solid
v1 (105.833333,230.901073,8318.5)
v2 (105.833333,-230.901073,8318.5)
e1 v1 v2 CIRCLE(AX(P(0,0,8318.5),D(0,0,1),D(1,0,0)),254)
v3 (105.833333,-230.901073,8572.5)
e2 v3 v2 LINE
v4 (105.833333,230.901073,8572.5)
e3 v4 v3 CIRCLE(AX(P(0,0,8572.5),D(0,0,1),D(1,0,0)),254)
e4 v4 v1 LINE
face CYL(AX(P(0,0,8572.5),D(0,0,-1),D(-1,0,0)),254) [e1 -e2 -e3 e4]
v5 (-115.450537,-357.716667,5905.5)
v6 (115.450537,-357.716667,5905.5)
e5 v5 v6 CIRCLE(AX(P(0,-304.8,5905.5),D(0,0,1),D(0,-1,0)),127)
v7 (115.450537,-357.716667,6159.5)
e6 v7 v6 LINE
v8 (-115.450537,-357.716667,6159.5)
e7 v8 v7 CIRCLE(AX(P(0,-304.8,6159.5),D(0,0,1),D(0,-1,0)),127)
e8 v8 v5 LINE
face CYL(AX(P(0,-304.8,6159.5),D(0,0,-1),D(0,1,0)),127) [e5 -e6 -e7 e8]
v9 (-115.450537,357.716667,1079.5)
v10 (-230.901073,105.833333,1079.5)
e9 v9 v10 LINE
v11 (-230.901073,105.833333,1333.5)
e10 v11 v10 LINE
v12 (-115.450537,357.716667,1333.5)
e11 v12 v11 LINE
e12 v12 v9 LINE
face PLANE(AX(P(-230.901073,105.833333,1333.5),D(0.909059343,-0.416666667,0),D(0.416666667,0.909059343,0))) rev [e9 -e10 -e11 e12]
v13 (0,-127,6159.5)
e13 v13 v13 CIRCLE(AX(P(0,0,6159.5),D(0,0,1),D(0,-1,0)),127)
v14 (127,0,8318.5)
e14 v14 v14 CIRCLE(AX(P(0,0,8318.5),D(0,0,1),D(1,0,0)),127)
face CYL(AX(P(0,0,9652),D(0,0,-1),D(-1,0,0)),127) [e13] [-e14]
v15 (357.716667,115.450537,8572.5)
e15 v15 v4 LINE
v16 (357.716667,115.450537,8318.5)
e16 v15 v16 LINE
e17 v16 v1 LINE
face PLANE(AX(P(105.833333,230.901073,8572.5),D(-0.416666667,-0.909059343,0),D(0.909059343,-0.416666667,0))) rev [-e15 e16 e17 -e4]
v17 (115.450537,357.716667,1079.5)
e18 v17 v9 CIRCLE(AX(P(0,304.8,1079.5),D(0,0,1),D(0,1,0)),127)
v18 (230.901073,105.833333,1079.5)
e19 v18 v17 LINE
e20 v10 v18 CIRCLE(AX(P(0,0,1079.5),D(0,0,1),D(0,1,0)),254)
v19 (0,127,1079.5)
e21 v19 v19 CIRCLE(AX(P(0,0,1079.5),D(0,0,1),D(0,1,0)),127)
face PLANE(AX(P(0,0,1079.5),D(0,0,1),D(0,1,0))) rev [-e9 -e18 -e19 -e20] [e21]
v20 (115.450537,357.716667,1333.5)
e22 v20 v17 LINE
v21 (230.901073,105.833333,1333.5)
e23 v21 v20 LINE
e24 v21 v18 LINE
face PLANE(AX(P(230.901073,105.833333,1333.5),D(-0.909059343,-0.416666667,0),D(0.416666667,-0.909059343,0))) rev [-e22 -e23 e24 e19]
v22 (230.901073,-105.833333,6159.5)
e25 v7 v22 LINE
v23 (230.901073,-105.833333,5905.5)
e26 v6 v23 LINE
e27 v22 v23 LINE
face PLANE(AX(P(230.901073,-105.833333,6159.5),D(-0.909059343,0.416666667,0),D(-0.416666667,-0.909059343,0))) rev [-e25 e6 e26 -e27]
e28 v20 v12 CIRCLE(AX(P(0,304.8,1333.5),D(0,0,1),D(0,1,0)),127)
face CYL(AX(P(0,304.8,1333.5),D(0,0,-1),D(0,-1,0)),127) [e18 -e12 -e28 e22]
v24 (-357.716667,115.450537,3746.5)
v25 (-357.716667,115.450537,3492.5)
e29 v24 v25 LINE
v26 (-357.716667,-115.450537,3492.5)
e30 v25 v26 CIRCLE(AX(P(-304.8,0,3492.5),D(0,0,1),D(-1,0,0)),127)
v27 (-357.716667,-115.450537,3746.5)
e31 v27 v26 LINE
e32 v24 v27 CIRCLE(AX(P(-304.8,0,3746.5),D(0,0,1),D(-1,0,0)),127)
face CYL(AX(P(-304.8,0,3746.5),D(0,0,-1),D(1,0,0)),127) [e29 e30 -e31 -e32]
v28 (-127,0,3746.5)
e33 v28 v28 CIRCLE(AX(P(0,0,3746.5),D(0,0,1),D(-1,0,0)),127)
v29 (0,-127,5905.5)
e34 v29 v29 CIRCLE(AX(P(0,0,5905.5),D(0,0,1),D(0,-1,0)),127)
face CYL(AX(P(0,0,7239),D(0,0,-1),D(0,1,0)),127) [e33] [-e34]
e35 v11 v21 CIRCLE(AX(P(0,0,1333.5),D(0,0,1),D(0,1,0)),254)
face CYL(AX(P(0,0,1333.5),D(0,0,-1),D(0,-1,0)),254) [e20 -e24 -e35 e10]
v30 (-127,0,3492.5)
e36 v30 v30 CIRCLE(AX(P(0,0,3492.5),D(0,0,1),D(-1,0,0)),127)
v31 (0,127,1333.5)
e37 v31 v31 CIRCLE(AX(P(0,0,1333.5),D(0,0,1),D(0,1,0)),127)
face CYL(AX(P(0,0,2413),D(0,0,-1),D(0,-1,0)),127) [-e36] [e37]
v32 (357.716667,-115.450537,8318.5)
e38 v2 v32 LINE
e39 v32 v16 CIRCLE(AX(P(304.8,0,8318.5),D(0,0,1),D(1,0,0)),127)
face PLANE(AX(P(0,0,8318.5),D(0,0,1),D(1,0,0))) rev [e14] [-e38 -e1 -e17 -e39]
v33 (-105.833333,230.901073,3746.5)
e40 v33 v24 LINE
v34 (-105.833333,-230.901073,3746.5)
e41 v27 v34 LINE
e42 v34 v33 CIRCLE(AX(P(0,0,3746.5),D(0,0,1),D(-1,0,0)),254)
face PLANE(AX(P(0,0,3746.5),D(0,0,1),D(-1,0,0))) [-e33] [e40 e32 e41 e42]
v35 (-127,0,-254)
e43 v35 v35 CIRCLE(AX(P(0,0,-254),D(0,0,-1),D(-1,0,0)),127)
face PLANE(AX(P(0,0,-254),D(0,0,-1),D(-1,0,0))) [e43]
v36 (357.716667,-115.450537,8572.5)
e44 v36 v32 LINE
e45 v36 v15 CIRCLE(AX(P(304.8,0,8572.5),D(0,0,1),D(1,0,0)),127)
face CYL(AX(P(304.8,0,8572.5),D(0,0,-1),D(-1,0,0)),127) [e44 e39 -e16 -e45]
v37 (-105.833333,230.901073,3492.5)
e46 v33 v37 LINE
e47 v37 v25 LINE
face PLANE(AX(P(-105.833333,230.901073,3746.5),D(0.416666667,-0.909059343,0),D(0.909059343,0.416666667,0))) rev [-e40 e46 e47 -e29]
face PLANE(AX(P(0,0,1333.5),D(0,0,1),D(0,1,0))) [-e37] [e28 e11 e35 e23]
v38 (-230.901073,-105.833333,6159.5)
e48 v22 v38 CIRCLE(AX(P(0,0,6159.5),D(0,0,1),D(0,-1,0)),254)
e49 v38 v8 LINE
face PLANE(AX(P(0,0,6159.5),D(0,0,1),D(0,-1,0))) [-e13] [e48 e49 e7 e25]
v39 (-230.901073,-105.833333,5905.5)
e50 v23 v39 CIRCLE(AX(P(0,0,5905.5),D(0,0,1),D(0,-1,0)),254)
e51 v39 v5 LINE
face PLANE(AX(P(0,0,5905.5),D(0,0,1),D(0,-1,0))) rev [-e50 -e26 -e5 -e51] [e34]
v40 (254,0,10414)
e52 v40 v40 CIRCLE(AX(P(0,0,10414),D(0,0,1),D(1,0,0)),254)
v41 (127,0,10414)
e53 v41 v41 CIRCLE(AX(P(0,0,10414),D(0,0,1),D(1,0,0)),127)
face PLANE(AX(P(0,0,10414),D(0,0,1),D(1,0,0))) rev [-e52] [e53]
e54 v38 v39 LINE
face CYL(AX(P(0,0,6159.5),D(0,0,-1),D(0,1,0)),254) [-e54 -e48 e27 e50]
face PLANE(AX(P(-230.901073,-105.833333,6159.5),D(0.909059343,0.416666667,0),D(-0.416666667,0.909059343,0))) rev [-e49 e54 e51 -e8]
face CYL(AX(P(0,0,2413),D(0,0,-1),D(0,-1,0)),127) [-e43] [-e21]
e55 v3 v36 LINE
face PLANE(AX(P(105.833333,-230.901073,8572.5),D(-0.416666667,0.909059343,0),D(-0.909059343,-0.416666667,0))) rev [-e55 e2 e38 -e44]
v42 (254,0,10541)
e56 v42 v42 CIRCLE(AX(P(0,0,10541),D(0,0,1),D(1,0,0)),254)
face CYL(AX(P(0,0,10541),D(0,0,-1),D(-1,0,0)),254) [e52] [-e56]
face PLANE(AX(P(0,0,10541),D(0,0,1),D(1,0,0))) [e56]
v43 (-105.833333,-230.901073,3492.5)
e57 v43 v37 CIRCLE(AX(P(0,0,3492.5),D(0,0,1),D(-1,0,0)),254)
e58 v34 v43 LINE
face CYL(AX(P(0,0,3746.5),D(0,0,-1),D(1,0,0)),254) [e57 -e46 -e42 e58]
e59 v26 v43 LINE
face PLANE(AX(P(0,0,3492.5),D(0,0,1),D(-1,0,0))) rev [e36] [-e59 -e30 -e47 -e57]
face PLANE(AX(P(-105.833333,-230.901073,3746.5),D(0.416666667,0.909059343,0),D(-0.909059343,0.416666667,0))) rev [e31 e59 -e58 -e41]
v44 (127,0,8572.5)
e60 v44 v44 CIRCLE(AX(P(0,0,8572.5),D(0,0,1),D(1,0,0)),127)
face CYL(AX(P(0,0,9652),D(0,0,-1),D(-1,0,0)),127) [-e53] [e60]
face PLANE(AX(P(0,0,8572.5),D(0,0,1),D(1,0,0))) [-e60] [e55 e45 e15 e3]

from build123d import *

# Parameters (mm, degrees)
SKETCH1_R                   = 127
BOSS_EXTRUDE1_DEPTH         = 2413
BOSS_EXTRUDE2_DEPTH         = 127
BODY_MOVE_COPY1_START       = 7239
BODY_MOVE_COPY1_OUTLINE_R   = 127
BODY_MOVE_COPY1_DEPTH       = 2413
BODY_MOVE_COPY1_START_2     = 8318.5
BODY_MOVE_COPY1_2_OUTLINE_R = 127
BODY_MOVE_COPY1_2_DEPTH     = 254
BODY_MOVE_COPY1_START_3     = 2413
BODY_MOVE_COPY1_3_OUTLINE_R = 127
BODY_MOVE_COPY1_3_DEPTH     = 2413
BODY_MOVE_COPY1_START_4     = 3492.5
BODY_MOVE_COPY1_4_OUTLINE_R = 127
BODY_MOVE_COPY1_4_DEPTH     = 254
BODY_MOVE_COPY1_START_5     = 4826
BODY_MOVE_COPY1_5_OUTLINE_R = 127
BODY_MOVE_COPY1_5_DEPTH     = 2413
BODY_MOVE_COPY1_START_6     = 5905.5
BODY_MOVE_COPY1_6_OUTLINE_R = 127
BODY_MOVE_COPY1_6_DEPTH     = 254
BODY_MOVE_COPY2_ANGLE       = 90
BODY_MOVE_COPY3_ANGLE       = 180
BODY_MOVE_COPY4_ANGLE       = 90
BOSS_EXTRUDE3_START         = 254
SKETCH4_R                   = 127
BOSS_EXTRUDE3_DEPTH         = 254
SKETCH5_R                   = 127
BOSS_EXTRUDE4_DEPTH         = 762
SKETCH6_R                   = 254
BOSS_EXTRUDE5_DEPTH         = 127


# Read off the part's stored shape, not the designer's step: Body-Move/Copy1
with BuildPart() as part:
    # Sketch1 → Boss-Extrude1 (new body)
    with BuildSketch(Plane.XY):
        Circle(SKETCH1_R)
    extrude(amount=BOSS_EXTRUDE1_DEPTH)

    # Sketch2 → Boss-Extrude2 (add, symmetric)
    with BuildSketch(Plane.XY.offset(1206.5)):
        with BuildLine():
            Line((105.833333333, 230.901073093), (357.716666667, 115.450536547))
            ThreePointArc((357.716666667, 115.450536547), (431.8, 0), (357.716666667, -115.450536547))
            Line((357.716666667, -115.450536547), (105.833333333, -230.901073093))
            ThreePointArc((105.833333333, -230.901073093), (-254, 0), (105.833333333, 230.901073093))
        make_face()
    extrude(amount=BOSS_EXTRUDE2_DEPTH, both=True)


with BuildPart() as body_2:
    # Body-Move/Copy1 outline → Body-Move/Copy1 (new body)
    with BuildSketch(Plane.XY.offset(BODY_MOVE_COPY1_START)):
        Circle(BODY_MOVE_COPY1_OUTLINE_R)
    extrude(amount=BODY_MOVE_COPY1_DEPTH)

    # Body-Move_Copy1 2 outline → Body-Move_Copy1 2 (add)
    with BuildSketch(Plane.XY.offset(BODY_MOVE_COPY1_START_2)):
        with BuildLine():
            ThreePointArc((105.833333333, 230.901073093), (-254, 0), (105.833333333, -230.901073093))
            Line((105.833333333, -230.901073093), (357.716666667, -115.450536547))
            ThreePointArc((357.716666667, -115.450536547), (431.8, 0), (357.716666667, 115.450536547))
            Line((357.716666667, 115.450536547), (105.833333333, 230.901073093))
        make_face()
        Circle(BODY_MOVE_COPY1_2_OUTLINE_R, mode=Mode.SUBTRACT)
    extrude(amount=BODY_MOVE_COPY1_2_DEPTH)


with BuildPart() as body_3:
    # Body-Move_Copy1 3 outline → Body-Move_Copy1 3 (new body)
    with BuildSketch(Plane.XY.offset(BODY_MOVE_COPY1_START_3)):
        Circle(BODY_MOVE_COPY1_3_OUTLINE_R)
    extrude(amount=BODY_MOVE_COPY1_3_DEPTH)

    # Body-Move_Copy1 4 outline → Body-Move_Copy1 4 (add)
    with BuildSketch(Plane.XY.offset(BODY_MOVE_COPY1_START_4)):
        with BuildLine():
            ThreePointArc((105.833333333, 230.901073093), (-254, 0), (105.833333333, -230.901073093))
            Line((105.833333333, -230.901073093), (357.716666667, -115.450536547))
            ThreePointArc((357.716666667, -115.450536547), (431.8, 0), (357.716666667, 115.450536547))
            Line((357.716666667, 115.450536547), (105.833333333, 230.901073093))
        make_face()
        Circle(BODY_MOVE_COPY1_4_OUTLINE_R, mode=Mode.SUBTRACT)
    extrude(amount=BODY_MOVE_COPY1_4_DEPTH)


with BuildPart() as body_4:
    # Body-Move_Copy1 5 outline → Body-Move_Copy1 5 (new body)
    with BuildSketch(Plane.XY.offset(BODY_MOVE_COPY1_START_5)):
        Circle(BODY_MOVE_COPY1_5_OUTLINE_R)
    extrude(amount=BODY_MOVE_COPY1_5_DEPTH)

    # Body-Move_Copy1 6 outline → Body-Move_Copy1 6 (add)
    with BuildSketch(Plane.XY.offset(BODY_MOVE_COPY1_START_6)):
        with BuildLine():
            ThreePointArc((105.833333333, 230.901073093), (-254, 0), (105.833333333, -230.901073093))
            Line((105.833333333, -230.901073093), (357.716666667, -115.450536547))
            ThreePointArc((357.716666667, -115.450536547), (431.8, 0), (357.716666667, 115.450536547))
            Line((357.716666667, 115.450536547), (105.833333333, 230.901073093))
        make_face()
        Circle(BODY_MOVE_COPY1_6_OUTLINE_R, mode=Mode.SUBTRACT)
    extrude(amount=BODY_MOVE_COPY1_6_DEPTH)


with BuildPart() as body_4_1:
    # Body-Move/Copy2: moved
    add(body_4.part.rotate(Axis((0, 0, 0), (0, 0, -1)), BODY_MOVE_COPY2_ANGLE))


with BuildPart() as body_3_1:
    # Body-Move/Copy3: moved
    add(body_3.part.rotate(Axis((0, 0, 0), (0, 0, 1)), BODY_MOVE_COPY3_ANGLE))


with BuildPart() as part_1:
    # Body-Move/Copy4: moved
    add(part.part.rotate(Axis((0, 0, 0), (0, 0, 1)), BODY_MOVE_COPY4_ANGLE))

    # Combine1: union body 2, body 4, body 3
    add(body_2.part)
    add(body_4_1.part)
    add(body_3_1.part)

    # Sketch4 → Boss-Extrude3 (add)
    with BuildSketch(Plane(origin=(0, 0, 0), x_dir=(-1, 0, 0), z_dir=(0, 0, -1)).offset(BOSS_EXTRUDE3_START)):
        Circle(SKETCH4_R)
    extrude(amount=-BOSS_EXTRUDE3_DEPTH)

    # Sketch5 → Boss-Extrude4 (add)
    with BuildSketch(Plane.XY.offset(9652)):
        with Locations(Location((0, 0, 0), (0, 0, 180))):
            Circle(SKETCH5_R)
    extrude(amount=BOSS_EXTRUDE4_DEPTH)

    # Sketch6 → Boss-Extrude5 (add)
    with BuildSketch(Plane.XY.offset(10414)):
        Circle(SKETCH6_R)
    extrude(amount=BOSS_EXTRUDE5_DEPTH)


solid = part_1.part
